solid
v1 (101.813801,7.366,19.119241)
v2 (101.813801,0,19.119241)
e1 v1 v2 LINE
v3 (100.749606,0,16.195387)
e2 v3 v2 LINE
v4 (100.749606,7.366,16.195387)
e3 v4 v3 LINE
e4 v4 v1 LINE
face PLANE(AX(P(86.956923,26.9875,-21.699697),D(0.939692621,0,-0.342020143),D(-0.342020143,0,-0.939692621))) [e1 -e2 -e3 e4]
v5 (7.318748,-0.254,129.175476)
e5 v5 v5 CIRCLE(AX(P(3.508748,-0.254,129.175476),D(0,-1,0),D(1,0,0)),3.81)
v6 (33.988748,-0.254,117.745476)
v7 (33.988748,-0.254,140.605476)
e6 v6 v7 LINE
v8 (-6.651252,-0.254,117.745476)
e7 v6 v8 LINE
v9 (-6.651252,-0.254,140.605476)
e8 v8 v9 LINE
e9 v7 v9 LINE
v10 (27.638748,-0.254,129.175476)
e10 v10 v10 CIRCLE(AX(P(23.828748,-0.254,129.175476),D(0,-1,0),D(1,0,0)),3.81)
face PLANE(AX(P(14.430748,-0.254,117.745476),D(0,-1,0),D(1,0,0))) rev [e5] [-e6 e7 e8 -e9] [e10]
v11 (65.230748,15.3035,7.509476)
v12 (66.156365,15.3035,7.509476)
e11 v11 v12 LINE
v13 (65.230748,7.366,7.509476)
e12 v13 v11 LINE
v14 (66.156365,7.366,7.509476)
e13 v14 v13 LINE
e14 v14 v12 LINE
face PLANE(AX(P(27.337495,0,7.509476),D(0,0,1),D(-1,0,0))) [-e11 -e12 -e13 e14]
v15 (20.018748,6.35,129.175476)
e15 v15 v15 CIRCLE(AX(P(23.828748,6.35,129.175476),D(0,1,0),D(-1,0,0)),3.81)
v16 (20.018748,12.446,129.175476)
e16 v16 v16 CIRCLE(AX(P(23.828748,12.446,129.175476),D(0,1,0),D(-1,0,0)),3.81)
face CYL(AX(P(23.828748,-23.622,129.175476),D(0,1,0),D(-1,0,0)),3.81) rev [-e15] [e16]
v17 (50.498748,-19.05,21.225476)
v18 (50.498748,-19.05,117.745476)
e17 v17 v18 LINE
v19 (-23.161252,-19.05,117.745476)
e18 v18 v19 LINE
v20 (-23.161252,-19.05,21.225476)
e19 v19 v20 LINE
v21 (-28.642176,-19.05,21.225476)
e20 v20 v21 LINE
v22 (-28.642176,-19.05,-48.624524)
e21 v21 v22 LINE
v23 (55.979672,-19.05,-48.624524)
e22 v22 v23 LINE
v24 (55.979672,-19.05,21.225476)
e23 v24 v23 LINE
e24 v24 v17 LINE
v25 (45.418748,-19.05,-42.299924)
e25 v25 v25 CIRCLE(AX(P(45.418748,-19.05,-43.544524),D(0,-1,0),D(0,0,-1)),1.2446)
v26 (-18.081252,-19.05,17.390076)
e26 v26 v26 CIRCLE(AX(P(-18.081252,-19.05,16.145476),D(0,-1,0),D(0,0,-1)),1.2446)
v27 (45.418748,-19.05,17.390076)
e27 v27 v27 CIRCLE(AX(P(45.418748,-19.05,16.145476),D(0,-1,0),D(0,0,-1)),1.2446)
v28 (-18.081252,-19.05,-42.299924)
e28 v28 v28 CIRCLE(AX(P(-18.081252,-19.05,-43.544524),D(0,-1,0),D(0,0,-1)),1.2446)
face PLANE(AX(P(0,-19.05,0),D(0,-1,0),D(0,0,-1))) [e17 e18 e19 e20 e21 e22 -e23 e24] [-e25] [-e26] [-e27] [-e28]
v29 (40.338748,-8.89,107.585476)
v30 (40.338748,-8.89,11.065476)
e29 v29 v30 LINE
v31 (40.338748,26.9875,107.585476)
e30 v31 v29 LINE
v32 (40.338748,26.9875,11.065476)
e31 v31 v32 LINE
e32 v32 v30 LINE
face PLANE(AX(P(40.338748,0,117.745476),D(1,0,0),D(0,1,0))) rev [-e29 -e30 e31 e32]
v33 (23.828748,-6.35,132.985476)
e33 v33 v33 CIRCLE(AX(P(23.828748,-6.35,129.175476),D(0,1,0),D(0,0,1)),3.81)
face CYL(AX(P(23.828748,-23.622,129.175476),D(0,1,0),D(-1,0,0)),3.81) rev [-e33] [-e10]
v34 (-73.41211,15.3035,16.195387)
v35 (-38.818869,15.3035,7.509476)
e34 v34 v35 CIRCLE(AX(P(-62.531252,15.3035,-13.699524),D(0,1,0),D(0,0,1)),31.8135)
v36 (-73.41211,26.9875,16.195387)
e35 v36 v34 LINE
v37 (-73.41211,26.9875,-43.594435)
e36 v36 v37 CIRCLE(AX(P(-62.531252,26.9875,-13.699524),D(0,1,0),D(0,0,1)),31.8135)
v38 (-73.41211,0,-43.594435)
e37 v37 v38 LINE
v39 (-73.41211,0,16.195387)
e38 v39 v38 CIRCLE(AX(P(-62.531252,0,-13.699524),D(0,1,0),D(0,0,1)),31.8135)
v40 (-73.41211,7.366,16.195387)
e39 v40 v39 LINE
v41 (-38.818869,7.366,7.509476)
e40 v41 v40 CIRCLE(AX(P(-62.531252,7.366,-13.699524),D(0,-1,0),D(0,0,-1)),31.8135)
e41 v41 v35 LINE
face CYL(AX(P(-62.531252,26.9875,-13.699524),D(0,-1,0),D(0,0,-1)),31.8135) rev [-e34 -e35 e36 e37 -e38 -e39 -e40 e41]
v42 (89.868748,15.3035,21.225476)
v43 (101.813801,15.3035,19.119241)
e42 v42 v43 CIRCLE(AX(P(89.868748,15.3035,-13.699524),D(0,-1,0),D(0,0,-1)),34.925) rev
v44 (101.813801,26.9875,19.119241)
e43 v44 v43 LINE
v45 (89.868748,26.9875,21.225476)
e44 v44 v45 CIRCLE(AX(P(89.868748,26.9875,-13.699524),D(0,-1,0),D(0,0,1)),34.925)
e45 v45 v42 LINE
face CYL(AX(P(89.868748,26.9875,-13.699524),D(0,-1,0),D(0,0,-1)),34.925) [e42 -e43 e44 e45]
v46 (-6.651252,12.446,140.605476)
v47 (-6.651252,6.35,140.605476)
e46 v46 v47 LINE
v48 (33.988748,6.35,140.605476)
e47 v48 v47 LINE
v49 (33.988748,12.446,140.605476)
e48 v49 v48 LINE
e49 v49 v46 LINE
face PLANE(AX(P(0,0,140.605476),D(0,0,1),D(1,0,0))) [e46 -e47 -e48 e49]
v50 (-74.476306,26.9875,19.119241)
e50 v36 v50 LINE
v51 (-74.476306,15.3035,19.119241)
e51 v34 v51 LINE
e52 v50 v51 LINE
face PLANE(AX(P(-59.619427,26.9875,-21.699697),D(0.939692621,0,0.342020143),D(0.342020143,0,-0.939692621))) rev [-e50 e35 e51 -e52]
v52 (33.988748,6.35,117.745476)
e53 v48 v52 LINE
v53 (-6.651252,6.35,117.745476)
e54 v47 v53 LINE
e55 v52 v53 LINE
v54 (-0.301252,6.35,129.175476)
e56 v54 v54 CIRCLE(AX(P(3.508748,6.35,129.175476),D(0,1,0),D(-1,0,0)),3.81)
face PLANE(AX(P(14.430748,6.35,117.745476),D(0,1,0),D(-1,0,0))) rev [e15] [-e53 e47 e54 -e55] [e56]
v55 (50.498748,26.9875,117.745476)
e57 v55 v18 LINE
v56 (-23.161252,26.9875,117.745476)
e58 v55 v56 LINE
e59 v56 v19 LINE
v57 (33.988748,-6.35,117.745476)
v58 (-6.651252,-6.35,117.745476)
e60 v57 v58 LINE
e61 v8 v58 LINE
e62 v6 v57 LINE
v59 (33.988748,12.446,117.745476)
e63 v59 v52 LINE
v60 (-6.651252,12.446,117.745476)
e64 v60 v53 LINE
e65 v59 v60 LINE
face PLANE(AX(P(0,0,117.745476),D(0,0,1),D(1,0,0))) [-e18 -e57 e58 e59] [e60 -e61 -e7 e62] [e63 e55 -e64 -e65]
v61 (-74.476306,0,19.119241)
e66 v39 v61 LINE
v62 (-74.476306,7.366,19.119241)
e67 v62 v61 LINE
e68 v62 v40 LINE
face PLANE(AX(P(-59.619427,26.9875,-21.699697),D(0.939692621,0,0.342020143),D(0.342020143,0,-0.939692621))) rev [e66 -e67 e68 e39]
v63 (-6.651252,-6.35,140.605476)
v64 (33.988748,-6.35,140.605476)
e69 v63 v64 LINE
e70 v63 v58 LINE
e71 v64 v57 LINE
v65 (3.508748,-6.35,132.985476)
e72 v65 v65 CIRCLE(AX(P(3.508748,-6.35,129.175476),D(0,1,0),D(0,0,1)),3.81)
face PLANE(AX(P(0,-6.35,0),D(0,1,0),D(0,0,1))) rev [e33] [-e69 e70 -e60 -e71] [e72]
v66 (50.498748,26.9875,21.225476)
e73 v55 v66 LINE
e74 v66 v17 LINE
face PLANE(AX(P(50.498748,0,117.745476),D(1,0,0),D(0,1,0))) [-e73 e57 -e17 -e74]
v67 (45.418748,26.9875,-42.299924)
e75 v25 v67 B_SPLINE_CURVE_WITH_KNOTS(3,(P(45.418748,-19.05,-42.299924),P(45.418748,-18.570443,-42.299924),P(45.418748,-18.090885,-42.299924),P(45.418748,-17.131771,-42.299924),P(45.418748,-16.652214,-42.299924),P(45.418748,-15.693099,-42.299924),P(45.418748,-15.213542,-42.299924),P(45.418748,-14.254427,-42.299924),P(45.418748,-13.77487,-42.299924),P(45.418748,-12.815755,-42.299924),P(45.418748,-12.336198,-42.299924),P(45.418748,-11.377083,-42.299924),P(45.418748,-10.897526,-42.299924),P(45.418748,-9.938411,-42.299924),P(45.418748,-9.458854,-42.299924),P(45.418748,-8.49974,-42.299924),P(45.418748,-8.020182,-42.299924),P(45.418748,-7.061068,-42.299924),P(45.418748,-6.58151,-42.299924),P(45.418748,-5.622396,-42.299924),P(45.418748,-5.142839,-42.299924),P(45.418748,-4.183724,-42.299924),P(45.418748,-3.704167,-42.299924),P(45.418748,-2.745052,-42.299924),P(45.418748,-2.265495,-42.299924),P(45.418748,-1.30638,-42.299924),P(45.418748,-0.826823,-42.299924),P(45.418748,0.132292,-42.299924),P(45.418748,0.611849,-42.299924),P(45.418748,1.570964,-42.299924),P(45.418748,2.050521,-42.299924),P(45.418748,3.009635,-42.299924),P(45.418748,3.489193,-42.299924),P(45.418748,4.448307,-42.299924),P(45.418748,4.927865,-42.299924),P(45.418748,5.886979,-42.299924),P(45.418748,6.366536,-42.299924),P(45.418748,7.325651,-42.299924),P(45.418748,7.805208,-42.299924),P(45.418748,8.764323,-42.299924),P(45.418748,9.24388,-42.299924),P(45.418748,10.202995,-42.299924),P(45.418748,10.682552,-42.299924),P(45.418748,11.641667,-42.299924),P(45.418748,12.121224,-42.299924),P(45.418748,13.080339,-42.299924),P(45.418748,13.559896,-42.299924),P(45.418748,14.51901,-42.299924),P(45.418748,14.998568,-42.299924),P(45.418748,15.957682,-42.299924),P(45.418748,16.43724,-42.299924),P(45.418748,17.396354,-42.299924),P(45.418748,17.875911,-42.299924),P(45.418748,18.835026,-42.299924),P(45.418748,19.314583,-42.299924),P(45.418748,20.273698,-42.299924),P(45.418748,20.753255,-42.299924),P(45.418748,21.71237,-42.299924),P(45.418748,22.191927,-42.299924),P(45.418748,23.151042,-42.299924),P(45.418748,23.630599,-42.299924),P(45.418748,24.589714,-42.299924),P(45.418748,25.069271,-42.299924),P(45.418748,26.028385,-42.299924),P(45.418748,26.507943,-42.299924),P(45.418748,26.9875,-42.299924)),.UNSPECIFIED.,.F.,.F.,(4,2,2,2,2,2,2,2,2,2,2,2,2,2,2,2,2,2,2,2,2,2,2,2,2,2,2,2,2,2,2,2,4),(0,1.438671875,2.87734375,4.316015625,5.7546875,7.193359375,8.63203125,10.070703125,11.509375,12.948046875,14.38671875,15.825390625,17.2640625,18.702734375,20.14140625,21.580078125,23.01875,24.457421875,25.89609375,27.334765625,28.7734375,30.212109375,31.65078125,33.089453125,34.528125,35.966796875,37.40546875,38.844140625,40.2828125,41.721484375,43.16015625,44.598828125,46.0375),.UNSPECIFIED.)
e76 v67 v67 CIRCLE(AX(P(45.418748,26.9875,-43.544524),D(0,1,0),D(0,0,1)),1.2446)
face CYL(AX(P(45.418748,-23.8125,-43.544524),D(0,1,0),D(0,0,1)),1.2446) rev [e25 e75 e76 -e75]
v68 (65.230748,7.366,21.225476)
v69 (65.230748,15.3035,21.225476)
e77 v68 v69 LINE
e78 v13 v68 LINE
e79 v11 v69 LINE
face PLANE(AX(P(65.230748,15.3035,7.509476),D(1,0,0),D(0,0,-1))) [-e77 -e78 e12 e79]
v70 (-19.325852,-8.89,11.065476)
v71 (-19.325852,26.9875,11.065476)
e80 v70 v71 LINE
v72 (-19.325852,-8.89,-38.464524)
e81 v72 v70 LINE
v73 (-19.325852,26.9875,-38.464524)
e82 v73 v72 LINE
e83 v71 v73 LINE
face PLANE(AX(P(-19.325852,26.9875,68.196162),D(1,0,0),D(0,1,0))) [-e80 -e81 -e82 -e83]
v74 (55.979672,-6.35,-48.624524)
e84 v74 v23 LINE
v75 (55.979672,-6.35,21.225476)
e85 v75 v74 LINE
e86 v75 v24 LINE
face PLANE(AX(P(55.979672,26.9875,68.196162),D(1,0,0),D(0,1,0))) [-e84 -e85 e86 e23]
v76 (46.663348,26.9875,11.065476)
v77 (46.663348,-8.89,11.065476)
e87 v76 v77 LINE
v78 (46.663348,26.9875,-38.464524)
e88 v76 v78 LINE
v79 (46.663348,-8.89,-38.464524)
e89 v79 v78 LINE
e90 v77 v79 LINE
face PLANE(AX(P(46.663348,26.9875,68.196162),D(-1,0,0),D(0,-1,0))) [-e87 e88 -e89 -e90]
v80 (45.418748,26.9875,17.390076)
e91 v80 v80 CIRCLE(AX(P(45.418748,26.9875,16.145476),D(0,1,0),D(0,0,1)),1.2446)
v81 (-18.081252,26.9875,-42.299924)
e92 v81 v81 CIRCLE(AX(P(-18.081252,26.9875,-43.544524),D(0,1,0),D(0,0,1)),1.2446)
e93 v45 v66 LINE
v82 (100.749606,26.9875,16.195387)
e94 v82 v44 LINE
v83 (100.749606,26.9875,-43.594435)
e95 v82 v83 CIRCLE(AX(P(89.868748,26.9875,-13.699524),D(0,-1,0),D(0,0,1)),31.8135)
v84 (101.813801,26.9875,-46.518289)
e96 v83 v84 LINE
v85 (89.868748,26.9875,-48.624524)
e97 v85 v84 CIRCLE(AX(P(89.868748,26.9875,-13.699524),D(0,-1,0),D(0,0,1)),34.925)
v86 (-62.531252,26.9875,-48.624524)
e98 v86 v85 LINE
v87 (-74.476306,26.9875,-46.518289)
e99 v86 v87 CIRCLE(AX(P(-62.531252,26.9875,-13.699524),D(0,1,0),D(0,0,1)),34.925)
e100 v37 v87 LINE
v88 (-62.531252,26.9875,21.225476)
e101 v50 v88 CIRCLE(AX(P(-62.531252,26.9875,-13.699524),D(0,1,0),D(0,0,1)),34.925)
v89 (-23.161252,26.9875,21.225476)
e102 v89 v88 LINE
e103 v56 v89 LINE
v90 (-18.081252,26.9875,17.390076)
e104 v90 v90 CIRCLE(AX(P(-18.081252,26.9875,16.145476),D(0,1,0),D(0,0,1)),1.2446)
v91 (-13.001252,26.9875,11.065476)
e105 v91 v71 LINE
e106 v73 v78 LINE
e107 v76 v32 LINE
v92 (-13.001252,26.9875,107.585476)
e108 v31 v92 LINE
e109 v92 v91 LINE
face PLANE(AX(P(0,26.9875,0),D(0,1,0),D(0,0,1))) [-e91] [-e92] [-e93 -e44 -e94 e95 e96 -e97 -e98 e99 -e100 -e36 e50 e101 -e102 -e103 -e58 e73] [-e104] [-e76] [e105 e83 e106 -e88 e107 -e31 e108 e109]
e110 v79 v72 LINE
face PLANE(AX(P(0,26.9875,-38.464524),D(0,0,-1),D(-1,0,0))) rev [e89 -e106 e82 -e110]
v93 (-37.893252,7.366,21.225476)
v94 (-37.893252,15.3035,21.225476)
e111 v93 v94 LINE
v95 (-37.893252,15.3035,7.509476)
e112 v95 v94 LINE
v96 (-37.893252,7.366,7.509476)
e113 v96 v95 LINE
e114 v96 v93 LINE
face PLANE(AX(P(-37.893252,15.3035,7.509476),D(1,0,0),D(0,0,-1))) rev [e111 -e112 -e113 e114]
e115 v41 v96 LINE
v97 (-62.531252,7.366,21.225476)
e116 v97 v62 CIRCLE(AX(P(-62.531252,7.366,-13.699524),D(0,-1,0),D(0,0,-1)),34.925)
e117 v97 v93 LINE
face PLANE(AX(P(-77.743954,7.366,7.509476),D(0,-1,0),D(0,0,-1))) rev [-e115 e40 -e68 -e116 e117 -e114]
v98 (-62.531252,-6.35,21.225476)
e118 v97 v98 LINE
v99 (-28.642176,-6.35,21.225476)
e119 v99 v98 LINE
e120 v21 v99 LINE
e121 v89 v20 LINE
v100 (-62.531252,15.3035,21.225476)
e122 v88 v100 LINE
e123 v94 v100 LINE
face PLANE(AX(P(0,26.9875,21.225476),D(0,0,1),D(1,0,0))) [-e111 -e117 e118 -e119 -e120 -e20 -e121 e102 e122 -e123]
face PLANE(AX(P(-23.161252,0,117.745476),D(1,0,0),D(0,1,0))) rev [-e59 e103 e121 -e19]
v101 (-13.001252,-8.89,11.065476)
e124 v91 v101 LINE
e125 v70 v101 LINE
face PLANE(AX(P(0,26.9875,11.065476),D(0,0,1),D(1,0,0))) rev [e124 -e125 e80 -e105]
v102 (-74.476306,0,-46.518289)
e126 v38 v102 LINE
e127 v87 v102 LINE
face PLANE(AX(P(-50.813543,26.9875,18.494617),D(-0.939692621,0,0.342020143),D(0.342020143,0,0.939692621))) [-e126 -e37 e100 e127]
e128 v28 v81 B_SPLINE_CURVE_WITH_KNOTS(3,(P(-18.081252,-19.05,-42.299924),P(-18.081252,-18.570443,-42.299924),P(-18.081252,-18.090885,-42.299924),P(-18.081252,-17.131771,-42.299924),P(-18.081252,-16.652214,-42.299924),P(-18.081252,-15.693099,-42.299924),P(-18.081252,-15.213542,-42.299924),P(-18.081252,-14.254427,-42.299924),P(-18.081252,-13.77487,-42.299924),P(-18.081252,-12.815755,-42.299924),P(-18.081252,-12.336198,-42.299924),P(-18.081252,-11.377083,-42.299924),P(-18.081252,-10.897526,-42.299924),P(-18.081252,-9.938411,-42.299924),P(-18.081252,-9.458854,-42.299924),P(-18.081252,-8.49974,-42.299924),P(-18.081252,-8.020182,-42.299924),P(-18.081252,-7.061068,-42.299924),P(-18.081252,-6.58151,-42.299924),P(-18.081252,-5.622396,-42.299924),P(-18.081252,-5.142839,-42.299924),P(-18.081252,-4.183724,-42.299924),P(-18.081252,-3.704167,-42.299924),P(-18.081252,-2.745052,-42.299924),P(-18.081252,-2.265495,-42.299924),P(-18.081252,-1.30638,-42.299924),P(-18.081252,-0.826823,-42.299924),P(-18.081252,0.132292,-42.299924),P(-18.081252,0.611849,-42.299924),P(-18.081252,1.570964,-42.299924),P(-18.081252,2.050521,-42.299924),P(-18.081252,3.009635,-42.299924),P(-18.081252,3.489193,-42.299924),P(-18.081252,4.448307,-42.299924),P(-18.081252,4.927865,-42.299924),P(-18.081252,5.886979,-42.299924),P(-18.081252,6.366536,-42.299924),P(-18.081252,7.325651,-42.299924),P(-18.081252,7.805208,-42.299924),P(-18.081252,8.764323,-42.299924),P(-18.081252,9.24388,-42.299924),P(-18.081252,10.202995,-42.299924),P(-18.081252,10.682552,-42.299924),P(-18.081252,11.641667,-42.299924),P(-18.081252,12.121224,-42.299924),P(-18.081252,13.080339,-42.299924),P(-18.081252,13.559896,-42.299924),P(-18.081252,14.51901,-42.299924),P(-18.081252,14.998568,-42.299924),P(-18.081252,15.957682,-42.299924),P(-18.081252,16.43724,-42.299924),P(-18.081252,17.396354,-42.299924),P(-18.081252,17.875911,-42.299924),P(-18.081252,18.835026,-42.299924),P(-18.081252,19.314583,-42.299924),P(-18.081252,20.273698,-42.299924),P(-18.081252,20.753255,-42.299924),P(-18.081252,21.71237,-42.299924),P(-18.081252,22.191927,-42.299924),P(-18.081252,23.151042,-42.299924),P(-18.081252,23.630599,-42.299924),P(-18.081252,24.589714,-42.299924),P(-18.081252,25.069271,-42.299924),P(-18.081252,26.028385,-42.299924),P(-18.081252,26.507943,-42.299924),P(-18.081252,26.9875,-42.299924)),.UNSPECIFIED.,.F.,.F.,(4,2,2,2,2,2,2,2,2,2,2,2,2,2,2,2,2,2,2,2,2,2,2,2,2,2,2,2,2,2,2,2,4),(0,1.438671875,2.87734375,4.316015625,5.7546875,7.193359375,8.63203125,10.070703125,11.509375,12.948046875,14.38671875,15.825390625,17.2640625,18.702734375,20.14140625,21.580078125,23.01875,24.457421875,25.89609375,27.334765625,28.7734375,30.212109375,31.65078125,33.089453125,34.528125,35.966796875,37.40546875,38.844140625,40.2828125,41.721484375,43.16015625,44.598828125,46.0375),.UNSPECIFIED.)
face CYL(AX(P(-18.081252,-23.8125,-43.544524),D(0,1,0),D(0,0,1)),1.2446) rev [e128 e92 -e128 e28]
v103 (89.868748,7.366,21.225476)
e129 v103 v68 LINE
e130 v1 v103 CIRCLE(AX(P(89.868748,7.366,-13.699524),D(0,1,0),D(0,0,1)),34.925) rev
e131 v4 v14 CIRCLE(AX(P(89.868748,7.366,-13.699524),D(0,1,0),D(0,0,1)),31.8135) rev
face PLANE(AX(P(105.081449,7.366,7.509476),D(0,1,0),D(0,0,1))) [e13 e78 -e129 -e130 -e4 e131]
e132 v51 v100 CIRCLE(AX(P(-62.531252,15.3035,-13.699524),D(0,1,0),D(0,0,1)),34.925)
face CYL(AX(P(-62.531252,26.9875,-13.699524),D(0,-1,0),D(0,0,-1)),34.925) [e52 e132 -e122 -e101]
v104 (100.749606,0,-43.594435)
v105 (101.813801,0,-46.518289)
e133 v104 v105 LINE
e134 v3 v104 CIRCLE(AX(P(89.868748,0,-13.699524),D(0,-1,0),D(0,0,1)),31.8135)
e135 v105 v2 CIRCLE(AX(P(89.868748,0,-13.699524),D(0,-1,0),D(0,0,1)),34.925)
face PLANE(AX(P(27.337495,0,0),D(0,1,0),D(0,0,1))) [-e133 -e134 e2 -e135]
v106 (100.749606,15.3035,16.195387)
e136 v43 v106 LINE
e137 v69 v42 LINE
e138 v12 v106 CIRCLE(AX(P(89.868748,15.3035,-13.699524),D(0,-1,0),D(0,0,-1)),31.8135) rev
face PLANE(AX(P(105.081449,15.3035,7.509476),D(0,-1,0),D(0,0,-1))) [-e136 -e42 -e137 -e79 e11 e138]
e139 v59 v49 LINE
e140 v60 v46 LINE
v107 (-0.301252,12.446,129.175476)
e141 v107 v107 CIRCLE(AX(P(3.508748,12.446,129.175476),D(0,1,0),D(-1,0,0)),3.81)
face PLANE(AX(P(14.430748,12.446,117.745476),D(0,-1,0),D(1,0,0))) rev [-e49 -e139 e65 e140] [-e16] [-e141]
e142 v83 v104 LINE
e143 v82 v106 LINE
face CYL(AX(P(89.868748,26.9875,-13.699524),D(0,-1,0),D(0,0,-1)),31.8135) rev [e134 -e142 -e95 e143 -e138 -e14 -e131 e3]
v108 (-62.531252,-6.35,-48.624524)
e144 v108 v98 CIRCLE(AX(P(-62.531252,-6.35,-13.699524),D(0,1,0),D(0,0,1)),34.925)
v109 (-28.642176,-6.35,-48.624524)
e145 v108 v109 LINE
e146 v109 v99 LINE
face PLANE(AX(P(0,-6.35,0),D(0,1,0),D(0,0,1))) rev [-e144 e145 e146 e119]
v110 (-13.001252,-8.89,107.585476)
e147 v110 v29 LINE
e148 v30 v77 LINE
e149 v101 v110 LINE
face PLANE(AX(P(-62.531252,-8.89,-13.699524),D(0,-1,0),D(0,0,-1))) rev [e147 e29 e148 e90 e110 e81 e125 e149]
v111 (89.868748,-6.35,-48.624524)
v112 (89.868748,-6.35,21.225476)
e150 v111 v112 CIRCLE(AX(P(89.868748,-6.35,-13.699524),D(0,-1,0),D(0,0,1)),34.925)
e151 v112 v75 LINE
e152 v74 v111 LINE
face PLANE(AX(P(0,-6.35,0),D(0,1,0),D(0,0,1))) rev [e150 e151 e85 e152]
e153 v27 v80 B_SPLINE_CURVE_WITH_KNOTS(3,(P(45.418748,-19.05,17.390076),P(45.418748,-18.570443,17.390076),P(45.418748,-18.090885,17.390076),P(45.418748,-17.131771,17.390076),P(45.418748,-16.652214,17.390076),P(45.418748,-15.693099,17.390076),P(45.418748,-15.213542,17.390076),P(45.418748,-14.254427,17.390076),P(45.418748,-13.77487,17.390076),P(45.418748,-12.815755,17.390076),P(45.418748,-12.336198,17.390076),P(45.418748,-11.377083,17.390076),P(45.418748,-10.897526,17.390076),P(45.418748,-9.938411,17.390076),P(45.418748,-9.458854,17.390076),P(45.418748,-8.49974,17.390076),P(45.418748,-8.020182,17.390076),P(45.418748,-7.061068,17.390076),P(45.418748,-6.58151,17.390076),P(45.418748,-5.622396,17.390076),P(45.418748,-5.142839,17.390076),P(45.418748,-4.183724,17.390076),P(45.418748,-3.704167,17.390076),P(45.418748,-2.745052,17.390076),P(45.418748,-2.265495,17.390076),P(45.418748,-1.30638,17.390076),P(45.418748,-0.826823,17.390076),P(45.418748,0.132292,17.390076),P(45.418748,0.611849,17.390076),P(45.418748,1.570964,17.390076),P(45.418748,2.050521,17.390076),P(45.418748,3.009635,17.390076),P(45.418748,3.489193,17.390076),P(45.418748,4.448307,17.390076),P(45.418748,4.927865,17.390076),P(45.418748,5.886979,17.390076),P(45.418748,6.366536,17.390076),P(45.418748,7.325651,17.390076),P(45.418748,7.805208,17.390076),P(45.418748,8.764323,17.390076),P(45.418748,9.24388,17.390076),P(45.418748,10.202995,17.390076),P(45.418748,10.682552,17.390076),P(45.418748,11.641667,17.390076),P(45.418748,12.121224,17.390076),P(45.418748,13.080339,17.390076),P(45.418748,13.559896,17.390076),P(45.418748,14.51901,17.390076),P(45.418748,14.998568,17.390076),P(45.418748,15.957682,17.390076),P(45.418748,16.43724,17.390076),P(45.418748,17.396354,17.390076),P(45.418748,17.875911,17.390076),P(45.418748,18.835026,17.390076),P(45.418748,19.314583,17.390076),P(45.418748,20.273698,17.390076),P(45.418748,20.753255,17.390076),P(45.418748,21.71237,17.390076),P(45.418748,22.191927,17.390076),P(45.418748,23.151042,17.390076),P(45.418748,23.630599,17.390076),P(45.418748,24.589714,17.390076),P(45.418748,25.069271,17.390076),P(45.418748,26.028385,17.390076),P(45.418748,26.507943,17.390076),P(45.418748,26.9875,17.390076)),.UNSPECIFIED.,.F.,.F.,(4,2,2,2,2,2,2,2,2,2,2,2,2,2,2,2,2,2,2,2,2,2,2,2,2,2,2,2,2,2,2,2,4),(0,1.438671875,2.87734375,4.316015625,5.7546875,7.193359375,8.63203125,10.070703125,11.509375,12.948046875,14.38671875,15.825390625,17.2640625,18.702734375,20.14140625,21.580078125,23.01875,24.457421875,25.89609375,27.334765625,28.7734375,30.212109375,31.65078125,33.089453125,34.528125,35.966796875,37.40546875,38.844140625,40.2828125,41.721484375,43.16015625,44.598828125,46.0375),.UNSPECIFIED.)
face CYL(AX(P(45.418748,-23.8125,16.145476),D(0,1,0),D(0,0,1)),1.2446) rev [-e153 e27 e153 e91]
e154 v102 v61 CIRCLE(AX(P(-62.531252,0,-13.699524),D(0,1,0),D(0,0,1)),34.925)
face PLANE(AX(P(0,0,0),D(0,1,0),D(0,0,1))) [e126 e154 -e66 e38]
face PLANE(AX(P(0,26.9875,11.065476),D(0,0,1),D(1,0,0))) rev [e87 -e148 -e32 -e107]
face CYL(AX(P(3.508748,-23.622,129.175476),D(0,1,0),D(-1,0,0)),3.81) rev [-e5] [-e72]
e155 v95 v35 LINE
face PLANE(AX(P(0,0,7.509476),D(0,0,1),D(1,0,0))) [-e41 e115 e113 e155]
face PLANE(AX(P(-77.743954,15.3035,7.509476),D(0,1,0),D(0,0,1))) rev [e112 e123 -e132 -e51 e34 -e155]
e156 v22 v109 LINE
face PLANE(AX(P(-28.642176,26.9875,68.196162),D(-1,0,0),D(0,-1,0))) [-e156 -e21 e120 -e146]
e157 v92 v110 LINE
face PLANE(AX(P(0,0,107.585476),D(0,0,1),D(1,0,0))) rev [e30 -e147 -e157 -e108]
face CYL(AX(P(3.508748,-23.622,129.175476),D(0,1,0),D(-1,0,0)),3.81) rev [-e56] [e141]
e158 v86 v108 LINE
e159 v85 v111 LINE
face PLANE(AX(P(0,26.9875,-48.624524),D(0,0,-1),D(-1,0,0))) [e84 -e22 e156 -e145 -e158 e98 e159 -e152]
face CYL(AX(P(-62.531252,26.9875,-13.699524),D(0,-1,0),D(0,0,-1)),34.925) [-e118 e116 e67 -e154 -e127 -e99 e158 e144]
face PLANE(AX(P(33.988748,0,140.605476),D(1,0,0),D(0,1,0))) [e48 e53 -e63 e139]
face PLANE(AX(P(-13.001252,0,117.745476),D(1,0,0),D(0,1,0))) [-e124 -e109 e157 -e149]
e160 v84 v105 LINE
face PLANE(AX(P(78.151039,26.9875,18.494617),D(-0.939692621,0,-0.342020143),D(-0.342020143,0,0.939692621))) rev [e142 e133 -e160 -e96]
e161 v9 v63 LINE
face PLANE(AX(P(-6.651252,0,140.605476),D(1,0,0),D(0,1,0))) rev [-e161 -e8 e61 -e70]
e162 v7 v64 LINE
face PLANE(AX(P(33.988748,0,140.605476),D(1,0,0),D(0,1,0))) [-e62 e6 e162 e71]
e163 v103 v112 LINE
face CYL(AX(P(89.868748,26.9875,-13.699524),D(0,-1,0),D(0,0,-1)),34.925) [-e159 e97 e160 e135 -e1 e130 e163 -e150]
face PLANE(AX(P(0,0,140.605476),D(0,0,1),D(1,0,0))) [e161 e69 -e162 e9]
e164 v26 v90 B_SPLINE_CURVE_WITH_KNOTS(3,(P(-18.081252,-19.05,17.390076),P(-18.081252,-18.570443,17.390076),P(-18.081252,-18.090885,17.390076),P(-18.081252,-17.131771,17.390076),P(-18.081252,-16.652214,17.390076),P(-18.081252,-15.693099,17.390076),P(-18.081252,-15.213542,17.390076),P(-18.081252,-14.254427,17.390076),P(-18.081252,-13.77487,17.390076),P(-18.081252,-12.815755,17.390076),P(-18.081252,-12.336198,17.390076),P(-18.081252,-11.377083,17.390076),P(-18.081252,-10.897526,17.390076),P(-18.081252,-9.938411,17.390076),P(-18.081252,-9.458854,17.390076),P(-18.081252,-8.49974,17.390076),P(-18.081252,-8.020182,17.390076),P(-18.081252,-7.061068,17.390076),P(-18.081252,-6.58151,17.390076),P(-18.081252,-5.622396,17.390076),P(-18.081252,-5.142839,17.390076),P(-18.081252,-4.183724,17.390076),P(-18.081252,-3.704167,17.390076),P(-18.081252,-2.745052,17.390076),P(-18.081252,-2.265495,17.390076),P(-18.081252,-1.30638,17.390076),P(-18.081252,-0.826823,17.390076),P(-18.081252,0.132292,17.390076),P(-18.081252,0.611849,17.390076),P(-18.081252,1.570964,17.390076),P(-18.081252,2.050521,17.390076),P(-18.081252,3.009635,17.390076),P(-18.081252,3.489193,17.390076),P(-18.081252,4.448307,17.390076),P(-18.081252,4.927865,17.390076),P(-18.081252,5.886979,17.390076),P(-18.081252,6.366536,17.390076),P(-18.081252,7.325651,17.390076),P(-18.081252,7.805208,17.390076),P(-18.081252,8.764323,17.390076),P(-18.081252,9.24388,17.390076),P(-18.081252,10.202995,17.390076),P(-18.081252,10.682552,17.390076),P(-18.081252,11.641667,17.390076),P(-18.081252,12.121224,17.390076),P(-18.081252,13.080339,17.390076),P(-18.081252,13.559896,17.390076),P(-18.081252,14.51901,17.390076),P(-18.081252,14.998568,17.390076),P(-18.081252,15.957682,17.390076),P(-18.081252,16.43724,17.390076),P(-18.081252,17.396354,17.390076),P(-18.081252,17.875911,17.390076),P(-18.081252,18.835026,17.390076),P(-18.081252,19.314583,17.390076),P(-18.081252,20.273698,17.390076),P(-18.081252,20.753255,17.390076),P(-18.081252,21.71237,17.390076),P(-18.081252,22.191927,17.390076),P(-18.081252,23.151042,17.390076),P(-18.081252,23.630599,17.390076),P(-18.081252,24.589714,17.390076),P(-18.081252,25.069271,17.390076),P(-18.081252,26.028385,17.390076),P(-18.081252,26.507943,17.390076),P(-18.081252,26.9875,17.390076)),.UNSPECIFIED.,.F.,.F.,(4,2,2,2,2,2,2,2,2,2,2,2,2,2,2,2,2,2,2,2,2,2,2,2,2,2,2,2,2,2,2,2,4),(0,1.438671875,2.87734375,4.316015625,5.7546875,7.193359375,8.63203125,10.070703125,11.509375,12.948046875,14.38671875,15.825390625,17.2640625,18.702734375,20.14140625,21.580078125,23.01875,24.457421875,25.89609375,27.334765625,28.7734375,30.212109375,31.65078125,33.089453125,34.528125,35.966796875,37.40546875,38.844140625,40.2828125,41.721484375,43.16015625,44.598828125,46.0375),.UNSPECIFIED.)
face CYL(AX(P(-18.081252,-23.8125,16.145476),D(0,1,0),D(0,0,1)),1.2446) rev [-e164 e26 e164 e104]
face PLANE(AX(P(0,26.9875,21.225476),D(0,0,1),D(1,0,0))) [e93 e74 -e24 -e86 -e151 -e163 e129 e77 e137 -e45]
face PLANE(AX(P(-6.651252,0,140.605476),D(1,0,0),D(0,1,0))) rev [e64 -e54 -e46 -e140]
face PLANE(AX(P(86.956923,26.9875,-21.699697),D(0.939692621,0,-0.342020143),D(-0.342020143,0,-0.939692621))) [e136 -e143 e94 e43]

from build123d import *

# Parameters (mm, degrees)
BOSS_EXTRUDE1_DEPTH  = 26.9875
BOSS_EXTRUDE5_START  = -6.35
BOSS_EXTRUDE5_DEPTH  = 6.35
SKETCH3_W            = 36.83
SKETCH3_H            = 33.3375
BOSS_EXTRUDE7_DEPTH  = 96.52
SKETCH6_W            = 20.32
SKETCH6_H            = 33.3375
BOSS_EXTRUDE8_DEPTH  = 22.86
SKETCH7_W            = 22.86
SKETCH7_H            = 14.5415
SKETCH7_H_2          = 6.604
CUT_EXTRUDE1_DEPTH   = 21.082
SKETCH11_W           = 39.850701562
SKETCH11_H           = 7.9375
CUT_EXTRUDE3_DEPTH   = 13.716
SHELL1_START         = 3.81
SHELL1_DEPTH         = 23.1775
SHELL1_START_2       = 25.4635
SHELL1_2_DEPTH       = 1.524
SKETCH16_W           = 73.66
SKETCH16_H           = 166.37
BOSS_EXTRUDE9_DEPTH  = 12.7
CUT_EXTRUDE6_START   = -12.7
CUT_EXTRUDE6_DEPTH   = 12.7
SKETCH13_R           = 1.2446
CUT_EXTRUDE4_DEPTH   = 50.8
SKETCH20_W           = 61.160461962
SKETCH20_H           = 49.53
CUT_EXTRUDE8_DEPTH   = 35.8775
BOSS_EXTRUDE16_START = -69.85
SKETCH21_W           = 9.316323924
SKETCH21_H           = 46.0375
SKETCH21_W_2         = 9.316323925
BOSS_EXTRUDE16_DEPTH = 69.85
SKETCH22_W           = 22.86
SKETCH22_H           = 14.5415
SKETCH22_H_2         = 6.604
CUT_EXTRUDE9_DEPTH   = 19.558
SKETCH23_R           = 3.81
CUT_EXTRUDE10_DEPTH  = 36.068


# Read off the part's stored shape, not the designer's step: Shell1
with BuildPart() as part:
    # Sketch1 → Boss-Extrude1 (new body)
    with BuildSketch(Plane(origin=(0, 0, 0), x_dir=(1, 0, 0), z_dir=(0, 1, 0))):
        with BuildLine():
            ThreePointArc((-27.606252307, 13.699523808), (-37.835547974, 38.395228141), (-62.531252307, 48.624523808))
            Line((-62.531252307, 48.624523808), (-62.531252307, 45.513023808))
            ThreePointArc((-62.531252307, 45.513023808), (-40.035710723, 36.195065391), (-30.717752307, 13.699523808))
            ThreePointArc((-30.717752307, 13.699523808), (-40.035710723, -8.796017775), (-62.531252307, -18.113976192))
            Line((-62.531252307, -18.113976192), (-62.531252307, -21.225476192))
            ThreePointArc((-62.531252307, -21.225476192), (-37.835547974, -10.996180525), (-27.606252307, 13.699523808))
        make_face()
        with BuildLine():
            Line((-62.531252307, 45.513023808), (-62.531252307, 48.624523808))
            ThreePointArc((-62.531252307, 48.624523808), (-68.595914912, 48.093934582), (-74.476305812, 46.518288589))
            Line((-74.476305812, 46.518288589), (-73.412110136, 43.594434999))
            ThreePointArc((-73.412110136, 43.594434999), (-68.055608607, 45.029705258), (-62.531252307, 45.513023808))
        make_face()
        with BuildLine():
            ThreePointArc((-74.476305812, -19.119240973), (-68.595914912, -20.694886966), (-62.531252307, -21.225476192))
            Line((-62.531252307, -21.225476192), (-62.531252307, -18.113976192))
            ThreePointArc((-62.531252307, -18.113976192), (-68.055608607, -17.630657643), (-73.412110136, -16.195387383))
            Line((-73.412110136, -16.195387383), (-74.476305812, -19.119240973))
        make_face()
        with BuildLine():
            Line((13.668747693, 48.624523808), (-62.531252307, 48.624523808))
            ThreePointArc((-62.531252307, 48.624523808), (-37.835547974, 38.395228141), (-27.606252307, 13.699523808))
            ThreePointArc((-27.606252307, 13.699523808), (-37.835547974, -10.996180525), (-62.531252307, -21.225476192))
            Line((-62.531252307, -21.225476192), (13.668747693, -21.225476192))
            Line((13.668747693, -21.225476192), (13.668747693, 48.624523808))
        make_face()
    boss_extrude1 = extrude(amount=BOSS_EXTRUDE1_DEPTH)

    # Sketch1<5> → Boss-Extrude5 (add)
    with BuildSketch(Plane(origin=(0, 0, 0), x_dir=(1, 0, 0), z_dir=(0, 1, 0)).offset(BOSS_EXTRUDE5_START)):
        with BuildLine():
            Line((-62.531252307, -21.225476192), (13.668747693, -21.225476192))
            Line((13.668747693, -21.225476192), (13.668747693, 48.624523808))
            Line((13.668747693, 48.624523808), (-62.531252307, 48.624523808))
            ThreePointArc((-62.531252307, 48.624523808), (-97.456252307, 13.699523808), (-62.531252307, -21.225476192))
        make_face()
    boss_extrude5 = extrude(amount=BOSS_EXTRUDE5_DEPTH)

    # Mirror1: Boss-Extrude1, Boss-Extrude5 across plane
    add(boss_extrude1.mirror(Plane(origin=(13.668747693, 26.9875, 0), x_dir=(0, 0, 1), z_dir=(1, 0, 0))))
    add(boss_extrude5.mirror(Plane(origin=(13.668747693, 26.9875, 0), x_dir=(0, 0, 1), z_dir=(1, 0, 0))))

    # Sketch3 → Boss-Extrude7 (add)
    with BuildSketch(Plane.XY.offset(21.225476192)):
        with Locations((-4.746252307, 10.31875)):
            Rectangle(SKETCH3_W, SKETCH3_H)
        with Locations((32.083747693, 10.31875)):
            Rectangle(SKETCH3_W, SKETCH3_H)
    extrude(amount=BOSS_EXTRUDE7_DEPTH)

    # Sketch6 → Boss-Extrude8 (add)
    with BuildSketch(Plane.XY.offset(117.745476192)):
        with Locations((3.508747693, 10.31875)):
            Rectangle(SKETCH6_W, SKETCH6_H)
        with Locations((23.828747693, 10.31875)):
            Rectangle(SKETCH6_W, SKETCH6_H)
    extrude(amount=BOSS_EXTRUDE8_DEPTH)

    # Sketch7 → Cut-Extrude1 (cut)
    with BuildSketch(Plane.ZY.offset(6.651252307)):
        with Locations((129.175476192, 19.71675)):
            Rectangle(SKETCH7_W, SKETCH7_H)
        with Locations((129.175476192, 3.048)):
            Rectangle(SKETCH7_W, SKETCH7_H_2)
    extrude(amount=-CUT_EXTRUDE1_DEPTH, mode=Mode.SUBTRACT)

    # Sketch11 → Cut-Extrude3 (cut)
    with BuildSketch(Plane.XY.offset(21.225476192)):
        with Locations((-57.818603088, 11.33475)):
            Rectangle(SKETCH11_W, SKETCH11_H)
    cut_extrude3 = extrude(amount=-CUT_EXTRUDE3_DEPTH, mode=Mode.SUBTRACT)

    # Mirror2: Cut-Extrude3 across plane
    add(cut_extrude3.mirror(Plane.ZY.offset(-13.668747693)), mode=Mode.SUBTRACT)

    # Shell1 outline → Shell1 (cut)
    with BuildSketch(Plane(origin=(0, 0, 0), x_dir=(1, 0, 0), z_dir=(0, 1, 0)).offset(SHELL1_START)):
        with BuildLine():
            Line((-27.733252307, -9.771179169), (-27.733252307, -11.065476192))
            Line((-27.733252307, -11.065476192), (-13.001252307, -11.065476192))
            Line((-13.001252307, -11.065476192), (-13.001252307, -107.585476192))
            Line((-13.001252307, -107.585476192), (40.338747693, -107.585476192))
            Line((40.338747693, -107.585476192), (40.338747693, -11.065476192))
            Line((40.338747693, -11.065476192), (55.070747693, -11.065476192))
            Line((55.070747693, -11.065476192), (55.070747693, -9.771179169))
            ThreePointArc((55.070747693, -9.771179169), (47.902697541, 14.49030625), (55.979671618, 38.464523808))
            Line((55.979671618, 38.464523808), (-28.642176231, 38.464523808))
            ThreePointArc((-28.642176231, 38.464523808), (-20.565202155, 14.49030625), (-27.733252307, -9.771179169))
        make_face()
    extrude(amount=SHELL1_DEPTH, mode=Mode.SUBTRACT)

    # Shell1 2 outline → Shell1 2 (cut)
    with BuildSketch(Plane(origin=(0, 0, 0), x_dir=(1, 0, 0), z_dir=(0, 1, 0)).offset(SHELL1_START_2)):
        with BuildLine():
            ThreePointArc((-27.733252307, -9.771179169), (-28.181617576, -10.422609102), (-28.642176231, -11.065476192))
            Line((-28.642176231, -11.065476192), (-27.733252307, -11.065476192))
            Line((-27.733252307, -11.065476192), (-27.733252307, -9.771179169))
        make_face()
        with BuildLine():
            ThreePointArc((55.979671618, -11.065476192), (55.519112962, -10.422609101), (55.070747693, -9.771179169))
            Line((55.070747693, -9.771179169), (55.070747693, -11.065476192))
            Line((55.070747693, -11.065476192), (55.979671618, -11.065476192))
        make_face()
    extrude(amount=SHELL1_2_DEPTH, mode=Mode.SUBTRACT)

    # Sketch16 → Boss-Extrude9 (add)
    with BuildSketch(Plane.XZ.offset(6.35)):
        with Locations((13.668747693, 34.560476192)):
            Rectangle(SKETCH16_W, SKETCH16_H)
    extrude(amount=BOSS_EXTRUDE9_DEPTH)

    # Sketch17 → Cut-Extrude6 (cut)
    with BuildSketch(Plane(origin=(0, 3.81, 0), x_dir=(1, 0, 0), z_dir=(0, 1, 0)).offset(CUT_EXTRUDE6_START)):
        with BuildLine():
            Line((-28.642176231, 38.464523808), (55.979671618, 38.464523808))
            ThreePointArc((55.979671618, 38.464523808), (47.895247693, 13.699523808), (55.979671618, -11.065476192))
            Line((55.979671618, -11.065476192), (40.338747693, -11.065476192))
            Line((40.338747693, -11.065476192), (40.338747693, -107.585476192))
            Line((40.338747693, -107.585476192), (-13.001252307, -107.585476192))
            Line((-13.001252307, -107.585476192), (-13.001252307, -11.065476192))
            Line((-13.001252307, -11.065476192), (-28.642176231, -11.065476192))
            ThreePointArc((-28.642176231, -11.065476192), (-20.557752307, 13.699523808), (-28.642176231, 38.464523808))
        make_face()
    extrude(amount=CUT_EXTRUDE6_DEPTH, mode=Mode.SUBTRACT)

    # Sketch13 → Cut-Extrude4 (cut)
    with BuildSketch(Plane(origin=(0, 26.9875, 0), x_dir=(1, 0, 0), z_dir=(0, 1, 0))):
        with Locations(Location((45.418747693, -16.145476192, 0), (0, 0, 270))):
            Circle(SKETCH13_R)
        with Locations(Location((-18.081252307, -16.145476192, 0), (0, 0, 270))):
            Circle(SKETCH13_R)
        with Locations(Location((-18.081252307, 43.544523808, 0), (0, 0, 270))):
            Circle(SKETCH13_R)
        with Locations(Location((45.418747693, 43.544523808, 0), (0, 0, 270))):
            Circle(SKETCH13_R)
    extrude(amount=-CUT_EXTRUDE4_DEPTH, mode=Mode.SUBTRACT)

    # Sketch20 → Cut-Extrude8 (cut)
    with BuildSketch(Plane(origin=(0, 26.9875, 0), x_dir=(1, 0, 0), z_dir=(0, 1, 0))):
        with Locations((17.578978674, 13.699523808)):
            Rectangle(SKETCH20_W, SKETCH20_H)
    extrude(amount=-CUT_EXTRUDE8_DEPTH, mode=Mode.SUBTRACT)

    # Sketch21 → Boss-Extrude16 (add)
    with BuildSketch(Plane(origin=(0, 0, -48.624523808), x_dir=(-1, 0, 0), z_dir=(0, 0, -1)).offset(BOSS_EXTRUDE16_START)):
        with Locations((23.984014269, 3.96875)):
            Rectangle(SKETCH21_W, SKETCH21_H)
        with Locations((-51.321509656, 3.96875)):
            Rectangle(SKETCH21_W_2, SKETCH21_H)
    extrude(amount=BOSS_EXTRUDE16_DEPTH)

    # Sketch22 → Cut-Extrude9 (cut)
    with BuildSketch(Plane.ZY.offset(-14.430747693)):
        with Locations((129.175476192, 19.71675)):
            Rectangle(SKETCH22_W, SKETCH22_H)
        with Locations((129.175476192, 3.048)):
            Rectangle(SKETCH22_W, SKETCH22_H_2)
    extrude(amount=-CUT_EXTRUDE9_DEPTH, mode=Mode.SUBTRACT)

    # Sketch23 → Cut-Extrude10 (cut)
    with BuildSketch(Plane(origin=(0, 12.446, 0), x_dir=(1, 0, 0), z_dir=(0, 1, 0))):
        with Locations(Location((3.508747693, -129.175476192, 0), (0, 0, 180))):
            Circle(SKETCH23_R)
        with Locations(Location((23.828747693, -129.175476192, 0), (0, 0, 180))):
            Circle(SKETCH23_R)
    extrude(amount=-CUT_EXTRUDE10_DEPTH, mode=Mode.SUBTRACT)


solid = part.part
